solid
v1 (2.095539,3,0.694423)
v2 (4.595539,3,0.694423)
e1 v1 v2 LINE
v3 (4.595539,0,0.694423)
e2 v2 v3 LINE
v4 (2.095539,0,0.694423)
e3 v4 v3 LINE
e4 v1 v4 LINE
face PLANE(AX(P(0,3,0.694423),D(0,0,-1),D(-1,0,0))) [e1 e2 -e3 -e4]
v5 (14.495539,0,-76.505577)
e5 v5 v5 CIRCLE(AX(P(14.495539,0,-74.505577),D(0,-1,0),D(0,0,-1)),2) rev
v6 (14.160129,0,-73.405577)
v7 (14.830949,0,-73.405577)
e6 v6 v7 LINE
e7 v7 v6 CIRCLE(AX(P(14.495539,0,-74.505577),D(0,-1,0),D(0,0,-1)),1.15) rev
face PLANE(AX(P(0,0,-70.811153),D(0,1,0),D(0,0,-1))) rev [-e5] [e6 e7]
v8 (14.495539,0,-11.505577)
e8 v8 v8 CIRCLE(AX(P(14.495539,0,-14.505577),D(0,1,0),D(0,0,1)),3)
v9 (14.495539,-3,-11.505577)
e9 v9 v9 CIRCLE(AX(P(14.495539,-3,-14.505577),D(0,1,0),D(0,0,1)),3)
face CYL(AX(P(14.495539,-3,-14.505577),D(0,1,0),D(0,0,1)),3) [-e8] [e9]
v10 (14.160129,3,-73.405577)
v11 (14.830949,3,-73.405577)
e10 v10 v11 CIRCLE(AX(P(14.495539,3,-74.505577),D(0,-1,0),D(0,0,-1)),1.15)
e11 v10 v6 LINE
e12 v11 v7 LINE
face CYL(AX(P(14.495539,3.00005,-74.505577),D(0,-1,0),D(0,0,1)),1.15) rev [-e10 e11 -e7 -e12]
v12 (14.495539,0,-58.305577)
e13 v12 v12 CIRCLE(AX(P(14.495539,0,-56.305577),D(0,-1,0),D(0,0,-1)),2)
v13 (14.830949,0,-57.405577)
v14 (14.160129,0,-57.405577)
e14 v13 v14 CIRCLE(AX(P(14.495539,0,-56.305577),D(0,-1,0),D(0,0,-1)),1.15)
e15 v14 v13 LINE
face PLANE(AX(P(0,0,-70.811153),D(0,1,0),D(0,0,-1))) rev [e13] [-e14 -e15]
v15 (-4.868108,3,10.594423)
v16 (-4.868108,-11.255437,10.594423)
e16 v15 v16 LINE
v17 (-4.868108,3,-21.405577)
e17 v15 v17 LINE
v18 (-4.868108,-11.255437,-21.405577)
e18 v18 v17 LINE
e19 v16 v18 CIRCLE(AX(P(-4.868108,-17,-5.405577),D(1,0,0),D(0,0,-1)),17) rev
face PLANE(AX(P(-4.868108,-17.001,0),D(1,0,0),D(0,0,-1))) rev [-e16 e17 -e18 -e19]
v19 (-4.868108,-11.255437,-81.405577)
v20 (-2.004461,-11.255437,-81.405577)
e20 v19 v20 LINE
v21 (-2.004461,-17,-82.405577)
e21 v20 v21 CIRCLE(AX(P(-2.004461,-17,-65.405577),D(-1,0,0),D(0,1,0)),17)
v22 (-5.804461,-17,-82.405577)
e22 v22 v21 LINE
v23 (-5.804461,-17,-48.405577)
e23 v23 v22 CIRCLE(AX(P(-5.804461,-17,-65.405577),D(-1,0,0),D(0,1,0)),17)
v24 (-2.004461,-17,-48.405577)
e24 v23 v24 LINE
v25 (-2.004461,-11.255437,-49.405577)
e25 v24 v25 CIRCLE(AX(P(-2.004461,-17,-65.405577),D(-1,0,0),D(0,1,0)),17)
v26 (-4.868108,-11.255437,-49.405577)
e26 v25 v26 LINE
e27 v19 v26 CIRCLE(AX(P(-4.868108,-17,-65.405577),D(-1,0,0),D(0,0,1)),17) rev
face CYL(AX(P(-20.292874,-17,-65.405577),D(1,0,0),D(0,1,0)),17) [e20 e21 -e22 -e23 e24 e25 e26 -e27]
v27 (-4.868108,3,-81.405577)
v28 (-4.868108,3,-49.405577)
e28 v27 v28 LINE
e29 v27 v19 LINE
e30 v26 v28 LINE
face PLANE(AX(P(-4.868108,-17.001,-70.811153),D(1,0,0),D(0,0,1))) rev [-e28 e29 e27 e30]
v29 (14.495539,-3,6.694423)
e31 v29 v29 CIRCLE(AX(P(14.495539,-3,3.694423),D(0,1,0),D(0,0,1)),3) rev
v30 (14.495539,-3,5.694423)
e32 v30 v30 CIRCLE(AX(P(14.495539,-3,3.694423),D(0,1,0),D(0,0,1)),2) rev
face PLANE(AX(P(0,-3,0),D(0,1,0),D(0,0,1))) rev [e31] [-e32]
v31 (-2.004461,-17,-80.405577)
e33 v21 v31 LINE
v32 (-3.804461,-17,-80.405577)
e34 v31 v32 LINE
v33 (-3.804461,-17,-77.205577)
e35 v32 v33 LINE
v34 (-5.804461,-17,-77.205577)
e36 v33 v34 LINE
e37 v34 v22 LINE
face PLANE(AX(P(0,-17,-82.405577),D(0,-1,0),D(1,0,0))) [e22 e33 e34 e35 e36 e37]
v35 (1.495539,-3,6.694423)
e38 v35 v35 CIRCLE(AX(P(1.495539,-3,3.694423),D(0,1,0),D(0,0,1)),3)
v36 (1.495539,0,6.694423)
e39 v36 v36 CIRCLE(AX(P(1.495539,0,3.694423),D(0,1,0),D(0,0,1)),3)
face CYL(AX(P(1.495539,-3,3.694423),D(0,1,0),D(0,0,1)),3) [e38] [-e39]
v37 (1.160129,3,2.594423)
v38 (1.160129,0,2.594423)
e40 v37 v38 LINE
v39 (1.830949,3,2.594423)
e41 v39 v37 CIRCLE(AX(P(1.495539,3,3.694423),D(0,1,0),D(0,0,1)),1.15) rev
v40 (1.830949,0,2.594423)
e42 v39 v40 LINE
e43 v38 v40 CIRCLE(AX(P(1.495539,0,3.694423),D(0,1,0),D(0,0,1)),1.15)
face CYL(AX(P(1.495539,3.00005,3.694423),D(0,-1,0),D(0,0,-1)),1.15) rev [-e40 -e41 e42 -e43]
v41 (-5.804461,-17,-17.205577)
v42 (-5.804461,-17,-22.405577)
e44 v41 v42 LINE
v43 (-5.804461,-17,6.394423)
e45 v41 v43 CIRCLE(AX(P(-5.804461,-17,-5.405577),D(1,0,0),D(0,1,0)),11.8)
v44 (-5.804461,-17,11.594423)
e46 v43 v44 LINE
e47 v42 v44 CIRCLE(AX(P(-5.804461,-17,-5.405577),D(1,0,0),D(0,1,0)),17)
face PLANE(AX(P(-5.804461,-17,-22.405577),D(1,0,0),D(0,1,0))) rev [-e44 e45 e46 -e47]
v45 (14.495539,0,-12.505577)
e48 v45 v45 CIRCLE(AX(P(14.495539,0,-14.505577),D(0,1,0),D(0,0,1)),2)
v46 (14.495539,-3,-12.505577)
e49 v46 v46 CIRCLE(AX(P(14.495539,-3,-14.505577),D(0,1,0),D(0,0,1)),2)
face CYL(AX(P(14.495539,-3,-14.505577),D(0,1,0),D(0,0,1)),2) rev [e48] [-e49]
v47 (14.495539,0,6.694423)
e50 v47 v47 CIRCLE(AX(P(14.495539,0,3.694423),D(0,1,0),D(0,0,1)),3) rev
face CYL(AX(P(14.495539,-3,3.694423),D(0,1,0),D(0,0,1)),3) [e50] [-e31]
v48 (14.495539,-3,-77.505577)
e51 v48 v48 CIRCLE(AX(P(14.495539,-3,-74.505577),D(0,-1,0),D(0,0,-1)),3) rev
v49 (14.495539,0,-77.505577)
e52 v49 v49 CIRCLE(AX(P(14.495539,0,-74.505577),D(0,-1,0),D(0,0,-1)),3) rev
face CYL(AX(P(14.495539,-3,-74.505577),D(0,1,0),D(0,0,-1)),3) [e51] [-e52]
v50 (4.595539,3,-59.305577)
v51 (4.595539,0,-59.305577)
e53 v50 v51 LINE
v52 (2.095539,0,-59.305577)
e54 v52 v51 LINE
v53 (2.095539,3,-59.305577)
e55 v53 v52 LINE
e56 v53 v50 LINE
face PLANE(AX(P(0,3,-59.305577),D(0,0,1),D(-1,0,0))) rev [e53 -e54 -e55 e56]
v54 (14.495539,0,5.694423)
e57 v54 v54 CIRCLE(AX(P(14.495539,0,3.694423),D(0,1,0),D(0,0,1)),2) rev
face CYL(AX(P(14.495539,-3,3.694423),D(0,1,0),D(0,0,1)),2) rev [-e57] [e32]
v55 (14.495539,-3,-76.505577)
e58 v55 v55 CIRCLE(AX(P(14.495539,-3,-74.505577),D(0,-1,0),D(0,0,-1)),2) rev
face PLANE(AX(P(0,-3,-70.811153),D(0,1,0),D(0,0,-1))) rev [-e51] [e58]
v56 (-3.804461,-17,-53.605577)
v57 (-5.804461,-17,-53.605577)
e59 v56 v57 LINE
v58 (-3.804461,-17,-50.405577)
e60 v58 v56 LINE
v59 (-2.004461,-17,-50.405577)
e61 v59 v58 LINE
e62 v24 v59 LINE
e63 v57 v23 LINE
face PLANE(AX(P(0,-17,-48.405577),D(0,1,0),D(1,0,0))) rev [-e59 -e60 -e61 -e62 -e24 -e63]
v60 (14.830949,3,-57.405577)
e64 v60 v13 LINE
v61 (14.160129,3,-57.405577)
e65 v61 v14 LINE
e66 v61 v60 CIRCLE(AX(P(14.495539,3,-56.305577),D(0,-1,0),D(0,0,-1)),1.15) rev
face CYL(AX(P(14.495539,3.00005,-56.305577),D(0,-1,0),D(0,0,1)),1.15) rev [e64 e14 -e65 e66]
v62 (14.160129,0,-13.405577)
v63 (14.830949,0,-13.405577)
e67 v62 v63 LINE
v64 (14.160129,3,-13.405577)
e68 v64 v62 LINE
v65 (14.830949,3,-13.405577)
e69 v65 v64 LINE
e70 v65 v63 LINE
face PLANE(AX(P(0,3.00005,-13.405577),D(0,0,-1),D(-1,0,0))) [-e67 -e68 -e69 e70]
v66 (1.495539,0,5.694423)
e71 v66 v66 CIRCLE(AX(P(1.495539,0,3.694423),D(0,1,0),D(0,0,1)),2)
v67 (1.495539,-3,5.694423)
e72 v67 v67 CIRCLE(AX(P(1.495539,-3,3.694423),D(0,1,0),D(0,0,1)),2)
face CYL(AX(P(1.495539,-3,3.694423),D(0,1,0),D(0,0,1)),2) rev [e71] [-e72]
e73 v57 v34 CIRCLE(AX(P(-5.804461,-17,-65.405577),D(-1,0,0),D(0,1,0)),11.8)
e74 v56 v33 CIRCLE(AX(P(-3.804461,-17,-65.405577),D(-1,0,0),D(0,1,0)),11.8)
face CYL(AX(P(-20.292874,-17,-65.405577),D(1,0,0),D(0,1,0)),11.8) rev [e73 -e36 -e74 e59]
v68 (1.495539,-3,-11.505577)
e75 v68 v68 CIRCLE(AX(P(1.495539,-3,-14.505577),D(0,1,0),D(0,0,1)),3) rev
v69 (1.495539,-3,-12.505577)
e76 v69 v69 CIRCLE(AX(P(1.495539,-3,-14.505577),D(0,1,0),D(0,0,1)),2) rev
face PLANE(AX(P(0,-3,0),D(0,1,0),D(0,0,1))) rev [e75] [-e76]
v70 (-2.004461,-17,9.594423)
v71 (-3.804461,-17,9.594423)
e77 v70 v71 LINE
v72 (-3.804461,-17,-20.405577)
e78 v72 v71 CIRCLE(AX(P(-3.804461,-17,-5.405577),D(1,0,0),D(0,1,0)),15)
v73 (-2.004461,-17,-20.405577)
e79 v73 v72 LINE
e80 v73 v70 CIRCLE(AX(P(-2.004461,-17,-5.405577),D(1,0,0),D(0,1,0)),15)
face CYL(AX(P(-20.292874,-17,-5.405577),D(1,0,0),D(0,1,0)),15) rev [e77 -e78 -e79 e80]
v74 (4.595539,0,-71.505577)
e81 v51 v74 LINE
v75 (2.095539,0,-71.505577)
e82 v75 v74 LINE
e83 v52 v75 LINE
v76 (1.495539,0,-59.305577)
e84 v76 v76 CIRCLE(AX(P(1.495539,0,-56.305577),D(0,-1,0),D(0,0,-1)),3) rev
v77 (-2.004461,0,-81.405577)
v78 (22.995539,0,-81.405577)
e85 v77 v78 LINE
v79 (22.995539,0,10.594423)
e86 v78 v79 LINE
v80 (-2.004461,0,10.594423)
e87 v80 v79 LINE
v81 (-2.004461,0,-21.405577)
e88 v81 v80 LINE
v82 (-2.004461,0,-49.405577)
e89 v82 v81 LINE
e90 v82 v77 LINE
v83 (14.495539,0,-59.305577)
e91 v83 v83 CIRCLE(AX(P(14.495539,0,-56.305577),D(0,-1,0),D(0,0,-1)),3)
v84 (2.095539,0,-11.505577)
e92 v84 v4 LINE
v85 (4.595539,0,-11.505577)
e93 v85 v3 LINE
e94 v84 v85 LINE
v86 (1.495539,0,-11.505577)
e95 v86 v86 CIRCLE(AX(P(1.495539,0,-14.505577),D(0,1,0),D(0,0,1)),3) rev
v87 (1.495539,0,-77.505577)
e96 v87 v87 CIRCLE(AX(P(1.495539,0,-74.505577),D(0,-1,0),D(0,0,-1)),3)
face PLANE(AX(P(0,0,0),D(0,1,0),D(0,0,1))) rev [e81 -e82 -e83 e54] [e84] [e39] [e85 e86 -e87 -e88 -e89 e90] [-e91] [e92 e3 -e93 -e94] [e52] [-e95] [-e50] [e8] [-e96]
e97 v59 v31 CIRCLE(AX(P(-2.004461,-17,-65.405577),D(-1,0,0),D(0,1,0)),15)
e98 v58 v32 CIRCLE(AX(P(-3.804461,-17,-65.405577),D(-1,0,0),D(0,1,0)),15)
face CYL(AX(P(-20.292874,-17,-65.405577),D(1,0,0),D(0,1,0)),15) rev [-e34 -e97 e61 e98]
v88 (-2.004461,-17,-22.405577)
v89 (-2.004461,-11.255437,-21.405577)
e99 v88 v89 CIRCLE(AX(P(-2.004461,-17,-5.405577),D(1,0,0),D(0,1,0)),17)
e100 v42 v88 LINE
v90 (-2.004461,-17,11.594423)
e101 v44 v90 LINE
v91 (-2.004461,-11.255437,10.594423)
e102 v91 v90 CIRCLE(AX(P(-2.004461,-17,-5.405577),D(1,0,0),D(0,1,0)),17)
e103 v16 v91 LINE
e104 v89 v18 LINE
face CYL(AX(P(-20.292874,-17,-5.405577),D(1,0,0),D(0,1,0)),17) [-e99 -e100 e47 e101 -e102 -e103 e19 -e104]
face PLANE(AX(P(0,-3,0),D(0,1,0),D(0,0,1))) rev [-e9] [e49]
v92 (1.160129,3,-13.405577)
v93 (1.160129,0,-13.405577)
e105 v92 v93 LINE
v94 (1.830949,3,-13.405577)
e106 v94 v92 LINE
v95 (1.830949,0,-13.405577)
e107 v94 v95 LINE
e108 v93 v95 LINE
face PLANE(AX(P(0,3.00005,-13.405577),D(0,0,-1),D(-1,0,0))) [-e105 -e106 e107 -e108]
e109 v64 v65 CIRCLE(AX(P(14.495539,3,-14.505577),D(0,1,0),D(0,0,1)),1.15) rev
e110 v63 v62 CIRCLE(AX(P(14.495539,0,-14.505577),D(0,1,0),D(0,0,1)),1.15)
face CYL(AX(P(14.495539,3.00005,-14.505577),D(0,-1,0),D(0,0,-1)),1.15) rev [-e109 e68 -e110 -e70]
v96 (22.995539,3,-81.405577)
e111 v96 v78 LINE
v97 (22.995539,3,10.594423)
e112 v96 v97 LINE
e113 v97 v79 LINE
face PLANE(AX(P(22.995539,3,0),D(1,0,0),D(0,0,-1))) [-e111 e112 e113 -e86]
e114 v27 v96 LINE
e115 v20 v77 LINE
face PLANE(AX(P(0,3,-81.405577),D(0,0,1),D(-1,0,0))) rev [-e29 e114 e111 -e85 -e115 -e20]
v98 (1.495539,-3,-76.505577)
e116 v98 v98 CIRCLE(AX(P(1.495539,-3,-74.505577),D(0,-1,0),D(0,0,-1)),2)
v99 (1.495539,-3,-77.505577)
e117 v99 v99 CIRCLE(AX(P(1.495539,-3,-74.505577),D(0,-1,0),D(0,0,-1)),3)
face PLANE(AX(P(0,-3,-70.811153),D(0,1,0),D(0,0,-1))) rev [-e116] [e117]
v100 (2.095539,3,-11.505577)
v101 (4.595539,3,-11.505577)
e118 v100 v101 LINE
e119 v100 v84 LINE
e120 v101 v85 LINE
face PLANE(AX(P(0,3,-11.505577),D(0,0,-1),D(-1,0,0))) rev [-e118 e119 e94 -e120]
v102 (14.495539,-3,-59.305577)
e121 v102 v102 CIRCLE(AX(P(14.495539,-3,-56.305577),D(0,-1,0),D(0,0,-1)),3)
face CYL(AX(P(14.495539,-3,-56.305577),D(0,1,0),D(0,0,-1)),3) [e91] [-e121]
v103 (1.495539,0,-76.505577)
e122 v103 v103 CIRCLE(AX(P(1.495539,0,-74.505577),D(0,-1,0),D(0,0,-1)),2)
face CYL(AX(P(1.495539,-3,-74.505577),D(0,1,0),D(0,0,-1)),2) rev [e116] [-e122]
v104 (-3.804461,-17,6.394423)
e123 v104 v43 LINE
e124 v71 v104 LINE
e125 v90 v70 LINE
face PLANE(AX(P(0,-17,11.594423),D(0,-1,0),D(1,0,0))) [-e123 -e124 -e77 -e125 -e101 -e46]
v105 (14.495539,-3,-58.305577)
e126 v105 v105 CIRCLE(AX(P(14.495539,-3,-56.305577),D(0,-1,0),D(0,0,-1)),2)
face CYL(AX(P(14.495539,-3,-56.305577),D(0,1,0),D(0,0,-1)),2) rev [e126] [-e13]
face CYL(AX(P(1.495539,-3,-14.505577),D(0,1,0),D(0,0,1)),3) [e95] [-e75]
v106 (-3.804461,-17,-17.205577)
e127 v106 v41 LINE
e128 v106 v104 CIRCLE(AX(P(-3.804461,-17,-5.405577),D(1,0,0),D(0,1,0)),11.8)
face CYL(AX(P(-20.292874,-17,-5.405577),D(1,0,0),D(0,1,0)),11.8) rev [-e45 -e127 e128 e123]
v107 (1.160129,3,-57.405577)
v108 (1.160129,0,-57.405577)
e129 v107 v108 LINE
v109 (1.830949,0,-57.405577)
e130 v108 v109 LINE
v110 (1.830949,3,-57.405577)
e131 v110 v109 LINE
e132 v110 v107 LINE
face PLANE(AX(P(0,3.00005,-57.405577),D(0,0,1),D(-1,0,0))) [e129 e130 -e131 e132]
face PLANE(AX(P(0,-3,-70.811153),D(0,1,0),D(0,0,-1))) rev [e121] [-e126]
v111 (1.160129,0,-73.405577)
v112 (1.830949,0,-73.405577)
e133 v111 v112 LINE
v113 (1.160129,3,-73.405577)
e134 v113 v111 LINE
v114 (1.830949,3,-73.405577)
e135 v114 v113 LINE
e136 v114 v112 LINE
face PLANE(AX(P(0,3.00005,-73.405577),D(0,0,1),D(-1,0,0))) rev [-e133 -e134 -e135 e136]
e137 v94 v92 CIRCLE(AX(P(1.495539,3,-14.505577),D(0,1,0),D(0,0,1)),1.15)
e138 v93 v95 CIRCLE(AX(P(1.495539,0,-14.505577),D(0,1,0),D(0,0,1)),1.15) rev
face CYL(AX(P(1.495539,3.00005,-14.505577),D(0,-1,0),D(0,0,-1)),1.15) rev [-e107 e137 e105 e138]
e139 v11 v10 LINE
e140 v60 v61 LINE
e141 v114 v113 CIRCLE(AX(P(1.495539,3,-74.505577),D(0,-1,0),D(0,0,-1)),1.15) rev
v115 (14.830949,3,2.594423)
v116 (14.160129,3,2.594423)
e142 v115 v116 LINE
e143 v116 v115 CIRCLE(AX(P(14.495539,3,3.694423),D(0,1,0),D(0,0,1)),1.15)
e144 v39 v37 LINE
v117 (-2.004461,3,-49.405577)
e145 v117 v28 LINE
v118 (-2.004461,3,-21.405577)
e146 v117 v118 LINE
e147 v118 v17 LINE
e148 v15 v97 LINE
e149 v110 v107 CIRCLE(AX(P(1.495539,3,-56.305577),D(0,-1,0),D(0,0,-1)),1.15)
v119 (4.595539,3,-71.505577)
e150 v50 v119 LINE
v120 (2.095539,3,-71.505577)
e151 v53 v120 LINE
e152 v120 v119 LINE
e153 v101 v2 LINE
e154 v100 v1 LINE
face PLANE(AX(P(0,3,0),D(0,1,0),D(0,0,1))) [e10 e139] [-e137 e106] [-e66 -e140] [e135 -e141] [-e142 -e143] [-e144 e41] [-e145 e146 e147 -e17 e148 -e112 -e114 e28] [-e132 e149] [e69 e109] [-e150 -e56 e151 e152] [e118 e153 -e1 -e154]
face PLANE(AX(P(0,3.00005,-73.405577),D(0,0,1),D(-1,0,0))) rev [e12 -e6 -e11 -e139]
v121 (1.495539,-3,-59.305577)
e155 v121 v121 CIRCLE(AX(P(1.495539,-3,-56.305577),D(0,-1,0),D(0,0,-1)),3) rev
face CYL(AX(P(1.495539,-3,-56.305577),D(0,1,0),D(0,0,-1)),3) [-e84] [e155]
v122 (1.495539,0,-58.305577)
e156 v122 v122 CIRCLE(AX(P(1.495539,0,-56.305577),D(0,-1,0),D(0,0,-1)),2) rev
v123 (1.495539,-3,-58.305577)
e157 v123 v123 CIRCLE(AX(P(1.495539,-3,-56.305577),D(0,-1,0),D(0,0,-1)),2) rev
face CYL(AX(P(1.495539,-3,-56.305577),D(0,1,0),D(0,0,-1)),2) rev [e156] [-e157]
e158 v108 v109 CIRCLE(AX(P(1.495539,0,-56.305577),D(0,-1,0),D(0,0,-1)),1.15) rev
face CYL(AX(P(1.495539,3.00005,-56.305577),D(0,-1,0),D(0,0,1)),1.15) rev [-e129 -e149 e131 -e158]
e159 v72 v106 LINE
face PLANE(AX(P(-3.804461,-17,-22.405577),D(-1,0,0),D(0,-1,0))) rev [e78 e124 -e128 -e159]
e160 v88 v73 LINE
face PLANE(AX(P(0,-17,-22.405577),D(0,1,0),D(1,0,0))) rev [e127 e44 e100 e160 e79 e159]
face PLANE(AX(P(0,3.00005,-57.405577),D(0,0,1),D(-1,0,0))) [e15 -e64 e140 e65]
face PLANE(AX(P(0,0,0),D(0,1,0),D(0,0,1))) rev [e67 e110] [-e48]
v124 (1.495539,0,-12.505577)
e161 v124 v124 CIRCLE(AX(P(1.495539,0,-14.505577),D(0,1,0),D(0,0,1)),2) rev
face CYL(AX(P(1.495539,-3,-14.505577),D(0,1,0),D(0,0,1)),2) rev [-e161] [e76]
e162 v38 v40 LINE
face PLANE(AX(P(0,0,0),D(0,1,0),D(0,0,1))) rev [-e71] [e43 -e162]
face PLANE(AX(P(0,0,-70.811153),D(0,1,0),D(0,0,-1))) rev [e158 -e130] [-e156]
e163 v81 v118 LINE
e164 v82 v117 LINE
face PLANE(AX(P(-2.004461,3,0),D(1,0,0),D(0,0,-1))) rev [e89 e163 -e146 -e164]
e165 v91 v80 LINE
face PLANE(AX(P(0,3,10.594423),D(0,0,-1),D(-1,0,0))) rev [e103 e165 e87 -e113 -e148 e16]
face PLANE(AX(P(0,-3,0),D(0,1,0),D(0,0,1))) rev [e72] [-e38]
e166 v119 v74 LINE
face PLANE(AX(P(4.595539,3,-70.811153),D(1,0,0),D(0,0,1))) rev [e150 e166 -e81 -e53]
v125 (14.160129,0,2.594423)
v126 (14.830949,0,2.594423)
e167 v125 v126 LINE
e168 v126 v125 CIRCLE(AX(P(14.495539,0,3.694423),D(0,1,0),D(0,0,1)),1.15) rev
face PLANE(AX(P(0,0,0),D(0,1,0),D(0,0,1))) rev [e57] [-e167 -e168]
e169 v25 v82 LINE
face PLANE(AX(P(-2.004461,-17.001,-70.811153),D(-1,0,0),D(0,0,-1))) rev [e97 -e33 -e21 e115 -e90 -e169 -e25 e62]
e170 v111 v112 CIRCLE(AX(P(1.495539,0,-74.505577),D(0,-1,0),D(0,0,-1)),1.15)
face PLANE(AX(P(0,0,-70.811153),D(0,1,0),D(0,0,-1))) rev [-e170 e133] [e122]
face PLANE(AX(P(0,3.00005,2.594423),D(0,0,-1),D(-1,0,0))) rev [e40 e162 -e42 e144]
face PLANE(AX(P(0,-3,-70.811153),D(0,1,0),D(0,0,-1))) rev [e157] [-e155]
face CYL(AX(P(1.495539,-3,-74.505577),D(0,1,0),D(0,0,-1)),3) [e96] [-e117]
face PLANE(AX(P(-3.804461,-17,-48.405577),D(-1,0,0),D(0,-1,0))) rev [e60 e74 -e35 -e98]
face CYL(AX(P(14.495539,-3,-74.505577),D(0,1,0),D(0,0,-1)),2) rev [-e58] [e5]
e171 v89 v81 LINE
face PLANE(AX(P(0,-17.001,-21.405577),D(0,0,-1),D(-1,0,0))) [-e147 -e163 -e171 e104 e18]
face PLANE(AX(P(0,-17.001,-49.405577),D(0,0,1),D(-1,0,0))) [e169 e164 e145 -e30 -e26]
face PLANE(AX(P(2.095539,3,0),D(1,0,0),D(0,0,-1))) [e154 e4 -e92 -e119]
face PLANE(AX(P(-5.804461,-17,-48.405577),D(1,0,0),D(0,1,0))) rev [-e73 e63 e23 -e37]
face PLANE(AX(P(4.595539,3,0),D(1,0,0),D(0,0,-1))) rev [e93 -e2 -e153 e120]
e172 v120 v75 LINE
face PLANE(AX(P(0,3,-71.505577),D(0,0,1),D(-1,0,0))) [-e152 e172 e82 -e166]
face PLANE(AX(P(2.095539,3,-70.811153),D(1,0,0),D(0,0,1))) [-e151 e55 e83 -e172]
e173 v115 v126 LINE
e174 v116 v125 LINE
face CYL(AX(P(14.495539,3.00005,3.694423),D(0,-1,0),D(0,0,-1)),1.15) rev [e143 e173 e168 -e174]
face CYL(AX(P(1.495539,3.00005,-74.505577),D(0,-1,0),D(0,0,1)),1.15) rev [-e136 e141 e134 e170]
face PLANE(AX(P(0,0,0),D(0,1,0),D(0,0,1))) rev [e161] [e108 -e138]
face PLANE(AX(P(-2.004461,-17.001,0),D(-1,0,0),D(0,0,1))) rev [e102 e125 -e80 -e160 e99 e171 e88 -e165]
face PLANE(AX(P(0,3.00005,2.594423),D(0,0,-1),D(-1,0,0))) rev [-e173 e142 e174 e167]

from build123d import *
from build123d.topology import SkipClean

# Parameters (mm, degrees)
SKETCH1_W           = 25
SKETCH1_H           = 46
SKETCH1_W_2         = 2.5
SKETCH1_H_2         = 12.2
BOSS_EXTRUDE1_DEPTH = 3
R_VOLUTION1_START   = -5.80446125
R_VOLUTION1_DEPTH   = 2
R_VOLUTION1_START_2 = -3.80446125
R_VOLUTION1_2_DEPTH = 1.8
BOSS_EXTRUDE3_START = -4.868108072
BOSS_EXTRUDE3_DEPTH = 2.863646822
SKETCH1_11_R        = 3
SKETCH1_11_R_2      = 2
BOSS_EXTRUDE5_DEPTH = 3
CUT_EXTRUDE1_DEPTH  = 46.512082642


# Read off the part's stored shape, not the designer's step: Révolution1, Boss-Extrude3
with BuildPart() as part:
    # Sketch1 → Boss-Extrude1 (new body)
    with BuildSketch(Plane(origin=(0, 0, 0), x_dir=(1, 0, 0), z_dir=(0, 1, 0))):
        with Locations((10.49553875, 12.405576735)):
            Rectangle(SKETCH1_W, SKETCH1_H)
        with Locations((3.34553875, 5.405576735)):
            Rectangle(SKETCH1_W_2, SKETCH1_H_2, mode=Mode.SUBTRACT)
    boss_extrude1 = extrude(amount=BOSS_EXTRUDE1_DEPTH)



with BuildPart() as body_2:
    # Révolution1 outline → Révolution1 (new body)
    with BuildSketch(Plane.YZ.offset(R_VOLUTION1_START)):
        with BuildLine():
            ThreePointArc((-17, 6.394423265), (-5.2, -5.405576735), (-17, -17.205576735))
            Line((-17, -17.205576735), (-17, -22.405576735))
            ThreePointArc((-17, -22.405576735), (0, -5.405576735), (-17, 11.594423265))
            Line((-17, 11.594423265), (-17, 6.394423265))
        make_face()
    r_volution1 = extrude(amount=R_VOLUTION1_DEPTH)


with BuildPart() as part_1:
    add(part.part)

    add(body_2.part)  # R_volution1 2 merges body 2
    # R_volution1 2 outline → R_volution1 2 (add)
    with BuildSketch(Plane.YZ.offset(R_VOLUTION1_START_2)):
        with BuildLine():
            ThreePointArc((-17, 9.594423265), (-2, -5.405576735), (-17, -20.405576735))
            Line((-17, -20.405576735), (-17, -22.405576735))
            ThreePointArc((-17, -22.405576735), (0, -5.405576735), (-17, 11.594423265))
            Line((-17, 11.594423265), (-17, 9.594423265))
        make_face()
    r_volution1_2 = extrude(amount=R_VOLUTION1_2_DEPTH)

    # Boss-Extrude3 outline → Boss-Extrude3 (add)
    with BuildSketch(Plane.YZ.offset(BOSS_EXTRUDE3_START)):
        with BuildLine():
            Line((3, 10.594423265), (-11.255437353, 10.594423265))
            ThreePointArc((-11.255437353, 10.594423265), (0, -5.405576735), (-11.255437353, -21.405576735))
            Line((-11.255437353, -21.405576735), (3, -21.405576735))
            Line((3, -21.405576735), (3, 10.594423265))
        make_face()
    boss_extrude3 = extrude(amount=BOSS_EXTRUDE3_DEPTH)

    # Sketch1<11> → Boss-Extrude5 (add)
    # profile 1 of 14: a face of its own
    with SkipClean():  # the faces are left unmerged after this step: merging them gives an invalid solid
        with BuildSketch(Plane(origin=(0, 0, 0), x_dir=(1, 0, 0), z_dir=(0, 1, 0))):
            with Locations(Location((14.49553875, -3.694423265, 0), (0, 0, 270))):
                Circle(SKETCH1_11_R)
            with Locations(Location((14.49553875, -3.694423265, 0), (0, 0, 270))):
                Circle(SKETCH1_11_R_2, mode=Mode.SUBTRACT)
        # profile 2 of 14: a face of its own
        with BuildSketch(Plane(origin=(0, 0, 0), x_dir=(1, 0, 0), z_dir=(0, 1, 0))):
            with Locations(Location((14.49553875, 14.505576735, 0), (0, 0, 270))):
                Circle(SKETCH1_11_R)
            with Locations(Location((14.49553875, 14.505576735, 0), (0, 0, 270))):
                Circle(SKETCH1_11_R_2, mode=Mode.SUBTRACT)
        # profile 3 of 14: a face of its own
        with BuildSketch(Plane(origin=(0, 0, 0), x_dir=(1, 0, 0), z_dir=(0, 1, 0))):
            with BuildLine():
                ThreePointArc((17.49553875, 14.505576735), (13.935704597, 17.452878166), (11.704481603, 13.405576735))
                Line((11.704481603, 13.405576735), (12.825209441, 13.405576735))
                ThreePointArc((12.825209441, 13.405576735), (13.921369184, 16.421387088), (16.49553875, 14.505576735))
                ThreePointArc((16.49553875, 14.505576735), (16.411349103, 13.931407169), (16.165868059, 13.405576735))
                Line((16.165868059, 13.405576735), (17.286595897, 13.405576735))
                ThreePointArc((17.286595897, 13.405576735), (17.44284018, 13.945742582), (17.49553875, 14.505576735))
            make_face()
        # profile 4 of 14: a face of its own
        with BuildSketch(Plane(origin=(0, 0, 0), x_dir=(1, 0, 0), z_dir=(0, 1, 0))):
            with BuildLine():
                Line((12.825209441, 13.405576735), (11.704481603, 13.405576735))
                ThreePointArc((11.704481603, 13.405576735), (14.49553875, 11.505576735), (17.286595897, 13.405576735))
                Line((17.286595897, 13.405576735), (16.165868059, 13.405576735))
                ThreePointArc((16.165868059, 13.405576735), (14.49553875, 12.505576735), (12.825209441, 13.405576735))
            make_face()
        # profile 5 of 14: a face of its own
        with BuildSketch(Plane(origin=(0, 0, 0), x_dir=(1, 0, 0), z_dir=(0, 1, 0))):
            with BuildLine():
                ThreePointArc((17.286595897, -2.594423265), (14.49553875, -0.694423265), (11.704481603, -2.594423265))
                Line((11.704481603, -2.594423265), (12.825209441, -2.594423265))
                ThreePointArc((12.825209441, -2.594423265), (14.49553875, -1.694423265), (16.165868059, -2.594423265))
                Line((16.165868059, -2.594423265), (17.286595897, -2.594423265))
            make_face()
        # profile 6 of 14: a face of its own
        with BuildSketch(Plane(origin=(0, 0, 0), x_dir=(1, 0, 0), z_dir=(0, 1, 0))):
            with BuildLine():
                Line((12.825209441, -2.594423265), (11.704481603, -2.594423265))
                ThreePointArc((11.704481603, -2.594423265), (13.935704597, -6.641724695), (17.49553875, -3.694423265))
                ThreePointArc((17.49553875, -3.694423265), (17.44284018, -3.134589112), (17.286595897, -2.594423265))
                Line((17.286595897, -2.594423265), (16.165868059, -2.594423265))
                ThreePointArc((16.165868059, -2.594423265), (16.411349103, -3.120253698), (16.49553875, -3.694423265))
                ThreePointArc((16.49553875, -3.694423265), (13.921369184, -5.610233618), (12.825209441, -2.594423265))
            make_face()
        # profile 7 of 14: a face of its own
        with BuildSketch(Plane(origin=(0, 0, 0), x_dir=(1, 0, 0), z_dir=(0, 1, 0))):
            with BuildLine():
                ThreePointArc((4.286595897, -2.594423265), (1.49553875, -0.694423265), (-1.295518397, -2.594423265))
                Line((-1.295518397, -2.594423265), (-0.174790559, -2.594423265))
                ThreePointArc((-0.174790559, -2.594423265), (1.49553875, -1.694423265), (3.165868059, -2.594423265))
                Line((3.165868059, -2.594423265), (4.286595897, -2.594423265))
            make_face()
        # profile 8 of 14: a face of its own
        with BuildSketch(Plane(origin=(0, 0, 0), x_dir=(1, 0, 0), z_dir=(0, 1, 0))):
            with BuildLine():
                Line((-0.174790559, -2.594423265), (-1.295518397, -2.594423265))
                ThreePointArc((-1.295518397, -2.594423265), (0.935704597, -6.641724695), (4.49553875, -3.694423265))
                ThreePointArc((4.49553875, -3.694423265), (4.44284018, -3.134589112), (4.286595897, -2.594423265))
                Line((4.286595897, -2.594423265), (3.165868059, -2.594423265))
                ThreePointArc((3.165868059, -2.594423265), (3.411349103, -3.120253698), (3.49553875, -3.694423265))
                ThreePointArc((3.49553875, -3.694423265), (0.921369184, -5.610233618), (-0.174790559, -2.594423265))
            make_face()
        # profile 9 of 14: a face of its own
        with BuildSketch(Plane(origin=(0, 0, 0), x_dir=(1, 0, 0), z_dir=(0, 1, 0))):
            with BuildLine():
                ThreePointArc((4.286595897, -2.594423265), (1.49553875, -0.694423265), (-1.295518397, -2.594423265))
                Line((-1.295518397, -2.594423265), (-0.174790559, -2.594423265))
                ThreePointArc((-0.174790559, -2.594423265), (1.49553875, -1.694423265), (3.165868059, -2.594423265))
                Line((3.165868059, -2.594423265), (4.286595897, -2.594423265))
            make_face()
        # profile 10 of 14: a face of its own
        with BuildSketch(Plane(origin=(0, 0, 0), x_dir=(1, 0, 0), z_dir=(0, 1, 0))):
            with BuildLine():
                Line((-0.174790559, -2.594423265), (-1.295518397, -2.594423265))
                ThreePointArc((-1.295518397, -2.594423265), (0.935704597, -6.641724695), (4.49553875, -3.694423265))
                ThreePointArc((4.49553875, -3.694423265), (4.44284018, -3.134589112), (4.286595897, -2.594423265))
                Line((4.286595897, -2.594423265), (3.165868059, -2.594423265))
                ThreePointArc((3.165868059, -2.594423265), (3.411349103, -3.120253698), (3.49553875, -3.694423265))
                ThreePointArc((3.49553875, -3.694423265), (0.921369184, -5.610233618), (-0.174790559, -2.594423265))
            make_face()
        # profile 11 of 14: a face of its own
        with BuildSketch(Plane(origin=(0, 0, 0), x_dir=(1, 0, 0), z_dir=(0, 1, 0))):
            with BuildLine():
                ThreePointArc((4.49553875, 14.505576735), (0.935704597, 17.452878166), (-1.295518397, 13.405576735))
                Line((-1.295518397, 13.405576735), (-0.174790559, 13.405576735))
                ThreePointArc((-0.174790559, 13.405576735), (0.921369184, 16.421387088), (3.49553875, 14.505576735))
                ThreePointArc((3.49553875, 14.505576735), (3.411349103, 13.931407169), (3.165868059, 13.405576735))
                Line((3.165868059, 13.405576735), (4.286595897, 13.405576735))
                ThreePointArc((4.286595897, 13.405576735), (4.44284018, 13.945742582), (4.49553875, 14.505576735))
            make_face()
        # profile 12 of 14: a face of its own
        with BuildSketch(Plane(origin=(0, 0, 0), x_dir=(1, 0, 0), z_dir=(0, 1, 0))):
            with BuildLine():
                Line((-0.174790559, 13.405576735), (-1.295518397, 13.405576735))
                ThreePointArc((-1.295518397, 13.405576735), (1.49553875, 11.505576735), (4.286595897, 13.405576735))
                Line((4.286595897, 13.405576735), (3.165868059, 13.405576735))
                ThreePointArc((3.165868059, 13.405576735), (1.49553875, 12.505576735), (-0.174790559, 13.405576735))
            make_face()
        # profile 13 of 14: a face of its own
        with BuildSketch(Plane(origin=(0, 0, 0), x_dir=(1, 0, 0), z_dir=(0, 1, 0))):
            with BuildLine():
                ThreePointArc((4.49553875, 14.505576735), (0.935704597, 17.452878166), (-1.295518397, 13.405576735))
                Line((-1.295518397, 13.405576735), (-0.174790559, 13.405576735))
                ThreePointArc((-0.174790559, 13.405576735), (0.921369184, 16.421387088), (3.49553875, 14.505576735))
                ThreePointArc((3.49553875, 14.505576735), (3.411349103, 13.931407169), (3.165868059, 13.405576735))
                Line((3.165868059, 13.405576735), (4.286595897, 13.405576735))
                ThreePointArc((4.286595897, 13.405576735), (4.44284018, 13.945742582), (4.49553875, 14.505576735))
            make_face()
        # profile 14 of 14: a face of its own
        with BuildSketch(Plane(origin=(0, 0, 0), x_dir=(1, 0, 0), z_dir=(0, 1, 0))):
            with BuildLine():
                Line((-0.174790559, 13.405576735), (-1.295518397, 13.405576735))
                ThreePointArc((-1.295518397, 13.405576735), (1.49553875, 11.505576735), (4.286595897, 13.405576735))
                Line((4.286595897, 13.405576735), (3.165868059, 13.405576735))
                ThreePointArc((3.165868059, 13.405576735), (1.49553875, 12.505576735), (-0.174790559, 13.405576735))
            make_face()
        boss_extrude5 = extrude(amount=-BOSS_EXTRUDE5_DEPTH)

    # Sketch1<12> → Cut-Extrude1 (cut, through all)
    with SkipClean():  # the faces are left unmerged after this step: merging them gives an invalid solid
        with BuildSketch(Plane(origin=(0, 0, 0), x_dir=(1, 0, 0), z_dir=(0, 1, 0))):
            with BuildLine():
                ThreePointArc((1.830948947, 13.405576735), (1.49553875, 15.655576735), (1.160128553, 13.405576735))
                Line((1.160128553, 13.405576735), (1.830948947, 13.405576735))
            make_face()
            with BuildLine():
                Line((1.830948947, -2.594423265), (1.160128553, -2.594423265))
                ThreePointArc((1.160128553, -2.594423265), (1.49553875, -4.844423265), (1.830948947, -2.594423265))
            make_face()
            with BuildLine():
                ThreePointArc((14.830948947, 13.405576735), (14.49553875, 15.655576735), (14.160128553, 13.405576735))
                Line((14.160128553, 13.405576735), (14.830948947, 13.405576735))
            make_face()
            with BuildLine():
                Line((14.830948947, -2.594423265), (14.160128553, -2.594423265))
                ThreePointArc((14.160128553, -2.594423265), (14.49553875, -4.844423265), (14.830948947, -2.594423265))
            make_face()
        cut_extrude1 = extrude(amount=CUT_EXTRUDE1_DEPTH, mode=Mode.SUBTRACT)

    # Mirror5: Boss-Extrude1, Révolution1, R_volution1 2, Boss-Extrude3, Boss-Extrude5, Cut-Extrude1 across plane
    with SkipClean():  # the faces are left unmerged after this step: merging them gives an invalid solid
        add(boss_extrude1.mirror(Plane(origin=(0, 3, -35.405576735), x_dir=(1, 0, 0), z_dir=(0, 0, -1))))
        add(r_volution1.mirror(Plane(origin=(0, 3, -35.405576735), x_dir=(1, 0, 0), z_dir=(0, 0, -1))))
        add(r_volution1_2.mirror(Plane(origin=(0, 3, -35.405576735), x_dir=(1, 0, 0), z_dir=(0, 0, -1))))
        add(boss_extrude3.mirror(Plane(origin=(0, 3, -35.405576735), x_dir=(1, 0, 0), z_dir=(0, 0, -1))))
        add(boss_extrude5.mirror(Plane(origin=(0, 3, -35.405576735), x_dir=(1, 0, 0), z_dir=(0, 0, -1))))
        add(cut_extrude1.mirror(Plane(origin=(0, 3, -35.405576735), x_dir=(1, 0, 0), z_dir=(0, 0, -1))), mode=Mode.SUBTRACT)


solid = part_1.part
